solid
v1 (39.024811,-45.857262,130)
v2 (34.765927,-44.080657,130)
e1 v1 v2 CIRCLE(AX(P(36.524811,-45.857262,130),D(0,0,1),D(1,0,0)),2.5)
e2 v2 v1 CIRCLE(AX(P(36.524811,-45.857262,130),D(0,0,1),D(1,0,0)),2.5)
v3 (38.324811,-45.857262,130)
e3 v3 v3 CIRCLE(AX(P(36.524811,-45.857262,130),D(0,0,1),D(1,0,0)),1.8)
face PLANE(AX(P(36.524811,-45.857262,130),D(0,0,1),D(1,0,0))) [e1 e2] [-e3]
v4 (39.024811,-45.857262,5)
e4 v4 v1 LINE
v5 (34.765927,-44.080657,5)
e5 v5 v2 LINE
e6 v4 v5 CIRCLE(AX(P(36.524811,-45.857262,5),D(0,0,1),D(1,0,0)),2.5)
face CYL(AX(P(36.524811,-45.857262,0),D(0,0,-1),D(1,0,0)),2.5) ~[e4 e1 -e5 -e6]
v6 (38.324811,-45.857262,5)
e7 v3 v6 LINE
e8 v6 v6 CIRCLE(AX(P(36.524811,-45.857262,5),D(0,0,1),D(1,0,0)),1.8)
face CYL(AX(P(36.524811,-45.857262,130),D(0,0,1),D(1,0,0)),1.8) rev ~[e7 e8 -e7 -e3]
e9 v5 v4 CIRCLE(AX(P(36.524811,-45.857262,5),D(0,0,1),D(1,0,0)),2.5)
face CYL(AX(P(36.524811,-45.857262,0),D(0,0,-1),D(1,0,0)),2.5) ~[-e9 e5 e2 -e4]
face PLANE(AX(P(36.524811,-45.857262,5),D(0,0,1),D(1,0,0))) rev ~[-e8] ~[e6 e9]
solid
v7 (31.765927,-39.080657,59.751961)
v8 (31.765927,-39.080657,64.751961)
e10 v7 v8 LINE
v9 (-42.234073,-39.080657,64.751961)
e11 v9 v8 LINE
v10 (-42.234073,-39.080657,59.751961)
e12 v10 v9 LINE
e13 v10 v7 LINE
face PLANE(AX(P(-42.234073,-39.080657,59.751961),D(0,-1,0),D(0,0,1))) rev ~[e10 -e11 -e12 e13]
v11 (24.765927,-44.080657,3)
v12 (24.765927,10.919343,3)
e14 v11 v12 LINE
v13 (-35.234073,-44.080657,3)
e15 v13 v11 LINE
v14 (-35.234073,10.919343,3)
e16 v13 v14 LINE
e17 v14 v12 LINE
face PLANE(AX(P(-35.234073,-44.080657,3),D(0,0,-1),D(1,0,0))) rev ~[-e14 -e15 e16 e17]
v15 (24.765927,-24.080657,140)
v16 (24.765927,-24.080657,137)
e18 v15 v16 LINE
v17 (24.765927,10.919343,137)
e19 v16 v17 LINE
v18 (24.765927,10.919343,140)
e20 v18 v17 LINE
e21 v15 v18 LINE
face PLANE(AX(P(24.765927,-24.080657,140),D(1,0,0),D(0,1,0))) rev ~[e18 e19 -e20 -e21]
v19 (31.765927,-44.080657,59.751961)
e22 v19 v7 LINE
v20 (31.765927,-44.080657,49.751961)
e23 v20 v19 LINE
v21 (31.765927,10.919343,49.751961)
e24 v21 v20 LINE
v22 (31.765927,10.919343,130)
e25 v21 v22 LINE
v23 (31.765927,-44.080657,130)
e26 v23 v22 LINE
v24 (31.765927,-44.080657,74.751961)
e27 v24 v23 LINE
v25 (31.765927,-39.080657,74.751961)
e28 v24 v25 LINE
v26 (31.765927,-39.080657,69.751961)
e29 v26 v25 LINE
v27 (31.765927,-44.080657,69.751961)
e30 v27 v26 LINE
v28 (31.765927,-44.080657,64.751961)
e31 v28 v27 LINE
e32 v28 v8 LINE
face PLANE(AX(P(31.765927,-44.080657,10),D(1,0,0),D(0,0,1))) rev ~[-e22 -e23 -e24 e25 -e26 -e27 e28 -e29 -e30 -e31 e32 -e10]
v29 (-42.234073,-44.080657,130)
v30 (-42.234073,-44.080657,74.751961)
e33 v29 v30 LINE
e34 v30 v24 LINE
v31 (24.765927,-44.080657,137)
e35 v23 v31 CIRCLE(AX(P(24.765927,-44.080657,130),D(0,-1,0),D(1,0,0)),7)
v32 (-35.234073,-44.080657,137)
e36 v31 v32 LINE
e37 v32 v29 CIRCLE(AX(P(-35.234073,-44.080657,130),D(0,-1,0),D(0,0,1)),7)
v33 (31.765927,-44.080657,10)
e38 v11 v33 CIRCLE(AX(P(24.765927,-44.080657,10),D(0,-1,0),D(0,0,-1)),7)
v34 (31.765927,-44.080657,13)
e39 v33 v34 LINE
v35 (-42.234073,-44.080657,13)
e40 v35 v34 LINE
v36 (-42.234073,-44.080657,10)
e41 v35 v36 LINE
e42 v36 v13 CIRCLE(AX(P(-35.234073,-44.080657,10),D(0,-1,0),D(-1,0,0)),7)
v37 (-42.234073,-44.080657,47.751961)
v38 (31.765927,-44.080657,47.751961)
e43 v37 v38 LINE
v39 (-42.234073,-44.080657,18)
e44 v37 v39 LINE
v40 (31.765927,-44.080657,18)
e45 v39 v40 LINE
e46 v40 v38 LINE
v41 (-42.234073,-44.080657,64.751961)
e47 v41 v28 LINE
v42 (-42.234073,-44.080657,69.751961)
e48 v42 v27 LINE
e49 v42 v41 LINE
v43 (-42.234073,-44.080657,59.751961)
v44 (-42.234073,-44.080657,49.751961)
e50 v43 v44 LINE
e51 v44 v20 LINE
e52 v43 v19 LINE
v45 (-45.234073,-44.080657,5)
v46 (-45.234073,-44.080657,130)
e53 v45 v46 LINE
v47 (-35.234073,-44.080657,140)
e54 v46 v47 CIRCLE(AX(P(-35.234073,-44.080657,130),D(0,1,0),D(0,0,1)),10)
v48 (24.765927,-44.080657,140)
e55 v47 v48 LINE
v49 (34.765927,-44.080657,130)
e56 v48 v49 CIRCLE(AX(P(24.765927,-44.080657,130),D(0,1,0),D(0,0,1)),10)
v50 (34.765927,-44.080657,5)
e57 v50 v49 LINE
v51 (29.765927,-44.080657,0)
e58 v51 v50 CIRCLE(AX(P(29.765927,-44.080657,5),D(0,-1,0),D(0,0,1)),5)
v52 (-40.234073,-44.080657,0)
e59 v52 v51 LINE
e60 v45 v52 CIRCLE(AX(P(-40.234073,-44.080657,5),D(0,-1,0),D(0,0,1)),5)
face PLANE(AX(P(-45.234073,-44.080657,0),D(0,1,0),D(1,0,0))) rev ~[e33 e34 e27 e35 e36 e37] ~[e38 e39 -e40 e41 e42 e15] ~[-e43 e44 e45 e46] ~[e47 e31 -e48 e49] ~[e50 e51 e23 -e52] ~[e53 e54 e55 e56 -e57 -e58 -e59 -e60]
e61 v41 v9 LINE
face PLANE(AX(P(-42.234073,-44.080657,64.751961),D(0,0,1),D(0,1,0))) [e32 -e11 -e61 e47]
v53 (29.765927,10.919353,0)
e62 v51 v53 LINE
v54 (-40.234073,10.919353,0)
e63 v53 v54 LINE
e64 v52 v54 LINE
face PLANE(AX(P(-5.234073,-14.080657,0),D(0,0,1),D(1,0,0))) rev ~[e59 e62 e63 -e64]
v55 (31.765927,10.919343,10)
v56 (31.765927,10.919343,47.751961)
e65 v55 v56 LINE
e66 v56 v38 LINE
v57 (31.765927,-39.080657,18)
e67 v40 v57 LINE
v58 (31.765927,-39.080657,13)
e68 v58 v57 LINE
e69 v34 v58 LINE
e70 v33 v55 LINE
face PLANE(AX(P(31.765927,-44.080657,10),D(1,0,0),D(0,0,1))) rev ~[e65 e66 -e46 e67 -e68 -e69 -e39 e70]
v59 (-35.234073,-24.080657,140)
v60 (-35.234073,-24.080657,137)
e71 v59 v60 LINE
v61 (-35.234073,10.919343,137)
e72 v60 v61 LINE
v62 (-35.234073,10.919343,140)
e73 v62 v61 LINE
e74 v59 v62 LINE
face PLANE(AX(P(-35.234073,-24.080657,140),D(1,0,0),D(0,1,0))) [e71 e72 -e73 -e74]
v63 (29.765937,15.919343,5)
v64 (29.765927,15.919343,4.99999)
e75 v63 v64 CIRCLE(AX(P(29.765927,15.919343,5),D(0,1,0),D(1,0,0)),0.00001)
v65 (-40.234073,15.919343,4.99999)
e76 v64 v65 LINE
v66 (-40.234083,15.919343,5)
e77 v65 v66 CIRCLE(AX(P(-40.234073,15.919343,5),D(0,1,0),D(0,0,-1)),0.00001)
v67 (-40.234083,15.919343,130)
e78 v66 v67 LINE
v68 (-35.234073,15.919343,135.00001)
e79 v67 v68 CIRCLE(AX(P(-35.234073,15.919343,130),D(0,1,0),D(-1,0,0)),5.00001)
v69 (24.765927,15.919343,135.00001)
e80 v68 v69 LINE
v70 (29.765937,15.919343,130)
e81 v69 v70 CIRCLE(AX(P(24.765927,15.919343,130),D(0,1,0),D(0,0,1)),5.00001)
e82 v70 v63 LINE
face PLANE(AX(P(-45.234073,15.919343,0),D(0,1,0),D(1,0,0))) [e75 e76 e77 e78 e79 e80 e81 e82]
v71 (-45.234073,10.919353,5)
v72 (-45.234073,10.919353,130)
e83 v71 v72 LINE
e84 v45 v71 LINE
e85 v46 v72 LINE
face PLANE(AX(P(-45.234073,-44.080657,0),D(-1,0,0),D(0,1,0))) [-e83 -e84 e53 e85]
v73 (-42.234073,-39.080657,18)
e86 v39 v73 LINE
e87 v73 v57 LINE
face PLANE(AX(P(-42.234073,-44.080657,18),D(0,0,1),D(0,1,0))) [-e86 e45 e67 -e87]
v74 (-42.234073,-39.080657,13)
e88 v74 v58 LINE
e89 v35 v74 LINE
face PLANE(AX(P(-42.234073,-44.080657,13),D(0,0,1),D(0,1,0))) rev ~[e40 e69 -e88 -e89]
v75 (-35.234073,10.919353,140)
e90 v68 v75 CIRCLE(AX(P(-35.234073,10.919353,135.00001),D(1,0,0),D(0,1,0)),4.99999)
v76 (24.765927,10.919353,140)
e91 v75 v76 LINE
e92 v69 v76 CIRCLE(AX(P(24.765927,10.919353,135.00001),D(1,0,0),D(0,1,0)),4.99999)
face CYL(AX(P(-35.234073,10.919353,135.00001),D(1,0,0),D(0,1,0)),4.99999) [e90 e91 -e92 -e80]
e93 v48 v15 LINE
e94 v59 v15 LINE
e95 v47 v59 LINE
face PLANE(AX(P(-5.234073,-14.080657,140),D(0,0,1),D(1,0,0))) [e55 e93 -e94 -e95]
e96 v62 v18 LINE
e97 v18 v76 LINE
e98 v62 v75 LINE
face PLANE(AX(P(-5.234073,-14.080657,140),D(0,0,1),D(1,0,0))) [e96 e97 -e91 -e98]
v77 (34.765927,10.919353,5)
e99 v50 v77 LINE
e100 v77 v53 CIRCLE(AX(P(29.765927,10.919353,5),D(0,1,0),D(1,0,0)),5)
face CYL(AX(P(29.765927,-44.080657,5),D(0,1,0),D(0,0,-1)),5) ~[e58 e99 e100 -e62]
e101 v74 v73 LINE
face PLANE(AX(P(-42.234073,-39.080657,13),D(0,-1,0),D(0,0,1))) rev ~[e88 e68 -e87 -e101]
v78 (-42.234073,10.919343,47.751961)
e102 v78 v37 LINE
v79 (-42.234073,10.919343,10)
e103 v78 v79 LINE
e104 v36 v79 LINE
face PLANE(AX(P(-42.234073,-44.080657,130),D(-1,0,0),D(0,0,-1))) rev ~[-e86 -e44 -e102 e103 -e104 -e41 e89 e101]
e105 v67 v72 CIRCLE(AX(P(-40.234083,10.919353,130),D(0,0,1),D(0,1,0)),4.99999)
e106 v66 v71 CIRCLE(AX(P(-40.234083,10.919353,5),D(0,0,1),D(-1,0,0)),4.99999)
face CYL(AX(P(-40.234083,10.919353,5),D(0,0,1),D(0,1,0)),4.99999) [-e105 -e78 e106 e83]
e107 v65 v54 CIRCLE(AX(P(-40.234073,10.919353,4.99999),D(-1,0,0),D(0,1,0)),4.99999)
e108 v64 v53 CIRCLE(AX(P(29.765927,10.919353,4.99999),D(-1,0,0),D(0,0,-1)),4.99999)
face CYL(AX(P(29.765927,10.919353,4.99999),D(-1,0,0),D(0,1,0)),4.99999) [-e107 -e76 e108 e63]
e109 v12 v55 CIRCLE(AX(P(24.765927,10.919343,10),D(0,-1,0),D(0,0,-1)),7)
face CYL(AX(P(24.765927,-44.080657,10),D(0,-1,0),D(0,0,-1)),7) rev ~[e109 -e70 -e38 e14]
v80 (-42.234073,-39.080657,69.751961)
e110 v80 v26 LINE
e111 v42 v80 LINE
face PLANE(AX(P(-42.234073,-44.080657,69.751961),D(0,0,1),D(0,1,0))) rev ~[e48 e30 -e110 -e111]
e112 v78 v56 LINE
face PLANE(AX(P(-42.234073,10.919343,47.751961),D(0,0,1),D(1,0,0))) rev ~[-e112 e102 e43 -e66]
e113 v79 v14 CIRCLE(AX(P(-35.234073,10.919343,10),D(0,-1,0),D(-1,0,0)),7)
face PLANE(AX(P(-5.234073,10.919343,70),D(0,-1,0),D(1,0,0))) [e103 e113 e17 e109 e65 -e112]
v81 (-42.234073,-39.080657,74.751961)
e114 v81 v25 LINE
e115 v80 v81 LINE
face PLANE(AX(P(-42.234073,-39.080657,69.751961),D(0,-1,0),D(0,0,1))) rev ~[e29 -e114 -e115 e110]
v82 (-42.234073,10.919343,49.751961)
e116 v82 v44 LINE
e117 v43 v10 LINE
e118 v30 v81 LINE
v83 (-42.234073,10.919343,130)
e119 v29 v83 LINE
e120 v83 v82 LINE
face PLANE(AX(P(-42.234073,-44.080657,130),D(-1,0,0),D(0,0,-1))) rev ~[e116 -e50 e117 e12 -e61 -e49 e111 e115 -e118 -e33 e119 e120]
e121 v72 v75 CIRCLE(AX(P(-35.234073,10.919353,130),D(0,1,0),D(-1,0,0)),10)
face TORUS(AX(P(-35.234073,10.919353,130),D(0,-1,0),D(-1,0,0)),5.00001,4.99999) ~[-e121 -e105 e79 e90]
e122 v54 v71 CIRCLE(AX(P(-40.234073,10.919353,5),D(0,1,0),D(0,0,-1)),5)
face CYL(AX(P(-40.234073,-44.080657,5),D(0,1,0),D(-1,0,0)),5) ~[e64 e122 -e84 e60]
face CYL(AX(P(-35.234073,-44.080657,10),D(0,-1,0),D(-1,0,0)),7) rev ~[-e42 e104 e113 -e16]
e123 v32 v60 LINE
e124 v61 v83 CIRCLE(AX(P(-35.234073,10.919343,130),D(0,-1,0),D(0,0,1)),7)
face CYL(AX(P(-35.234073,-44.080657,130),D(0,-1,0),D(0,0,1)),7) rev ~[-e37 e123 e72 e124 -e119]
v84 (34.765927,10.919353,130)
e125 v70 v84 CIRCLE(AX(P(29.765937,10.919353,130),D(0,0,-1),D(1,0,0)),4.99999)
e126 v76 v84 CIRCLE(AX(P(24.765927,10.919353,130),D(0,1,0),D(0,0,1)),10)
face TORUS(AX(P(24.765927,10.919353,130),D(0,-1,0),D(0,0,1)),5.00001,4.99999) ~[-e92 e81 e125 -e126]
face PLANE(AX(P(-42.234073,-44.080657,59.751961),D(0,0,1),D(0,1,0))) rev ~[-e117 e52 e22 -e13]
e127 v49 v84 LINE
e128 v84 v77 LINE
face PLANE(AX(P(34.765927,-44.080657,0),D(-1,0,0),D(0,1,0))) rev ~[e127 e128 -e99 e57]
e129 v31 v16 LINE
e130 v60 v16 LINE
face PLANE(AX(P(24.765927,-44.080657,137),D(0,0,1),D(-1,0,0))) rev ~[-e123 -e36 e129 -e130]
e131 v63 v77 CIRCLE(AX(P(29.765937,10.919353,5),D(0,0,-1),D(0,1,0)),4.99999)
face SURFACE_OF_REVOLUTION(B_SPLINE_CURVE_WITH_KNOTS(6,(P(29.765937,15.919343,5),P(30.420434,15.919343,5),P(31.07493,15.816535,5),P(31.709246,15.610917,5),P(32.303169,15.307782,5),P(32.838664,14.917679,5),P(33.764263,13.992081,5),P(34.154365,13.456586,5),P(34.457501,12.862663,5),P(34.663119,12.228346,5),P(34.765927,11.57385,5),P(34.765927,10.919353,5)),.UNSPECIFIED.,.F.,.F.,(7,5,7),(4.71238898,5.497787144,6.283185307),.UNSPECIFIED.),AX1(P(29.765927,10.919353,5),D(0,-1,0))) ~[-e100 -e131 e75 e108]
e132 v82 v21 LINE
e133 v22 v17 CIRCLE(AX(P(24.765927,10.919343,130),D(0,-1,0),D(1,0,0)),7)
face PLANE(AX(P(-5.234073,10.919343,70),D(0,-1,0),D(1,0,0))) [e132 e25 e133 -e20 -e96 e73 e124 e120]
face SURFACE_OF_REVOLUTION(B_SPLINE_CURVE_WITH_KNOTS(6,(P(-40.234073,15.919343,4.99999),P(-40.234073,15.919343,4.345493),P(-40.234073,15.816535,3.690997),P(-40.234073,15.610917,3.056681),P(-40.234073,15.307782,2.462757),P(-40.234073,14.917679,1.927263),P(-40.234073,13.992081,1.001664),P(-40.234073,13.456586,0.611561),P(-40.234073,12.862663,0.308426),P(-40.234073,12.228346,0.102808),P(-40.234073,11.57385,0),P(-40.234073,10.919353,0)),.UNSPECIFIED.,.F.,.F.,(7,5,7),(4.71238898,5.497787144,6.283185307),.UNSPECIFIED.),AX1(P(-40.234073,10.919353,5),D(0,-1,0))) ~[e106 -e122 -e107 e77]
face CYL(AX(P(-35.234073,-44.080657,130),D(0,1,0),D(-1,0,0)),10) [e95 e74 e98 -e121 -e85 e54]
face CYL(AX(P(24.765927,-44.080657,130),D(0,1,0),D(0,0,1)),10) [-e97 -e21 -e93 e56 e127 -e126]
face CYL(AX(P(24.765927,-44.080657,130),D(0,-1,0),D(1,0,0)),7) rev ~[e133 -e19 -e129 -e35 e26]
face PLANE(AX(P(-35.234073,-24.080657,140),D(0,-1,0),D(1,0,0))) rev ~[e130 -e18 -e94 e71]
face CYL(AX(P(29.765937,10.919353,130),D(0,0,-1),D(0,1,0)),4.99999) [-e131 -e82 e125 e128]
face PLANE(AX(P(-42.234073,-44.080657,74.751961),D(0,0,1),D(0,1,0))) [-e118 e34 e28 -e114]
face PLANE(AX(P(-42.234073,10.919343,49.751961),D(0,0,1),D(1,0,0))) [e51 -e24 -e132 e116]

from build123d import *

# Parameters (mm, degrees)
F0_W      = 80
F0_H      = 60
F1_DEPTH  = 140
F2_R      = 10
F3_R      = 10
F4_R      = 5
F5_R      = 5
F7_DEPTH  = 55
F9_W      = 74
F9_H      = 2
F10_DEPTH = 55
F11_W     = 60
F11_H     = 35
F12_DEPTH = 28
F13_R     = 4.99999
F14_W     = 5
F14_H     = 5
F15_DEPTH = 74
F16_W     = 5
F16_H     = 5
F17_DEPTH = 74
F18_R     = 2.5
F19_DEPTH = 130
F20_DEPTH = 5
F21_W     = 5
F21_H     = 5
F22_DEPTH = 74
F23_R     = 1.8
F24_DEPTH = 132


# Not quite as in the source:
# - a fillet or chamfer is up to 0.001 mm smaller than in the source, because OpenCascade refuses the exact size
# - a feature names something its author has since deleted; it is built from what else it names


with BuildPart() as f1:
    # F0 (on Top) → F1 (new body)
    with BuildSketch(Plane.XY):
        with Locations((-5.2340733026, -14.0806569159)):
            Rectangle(F0_W, F0_H)
    extrude(amount=F1_DEPTH)

    # F2
    f2_edges = [f1.edges().sort_by_distance(p)[0] for p in [
        (-45.234073, -14.080657, 140),
    ]]
    fillet(f2_edges, radius=F2_R)

    # F3
    f3_edges = [f1.edges().sort_by_distance(p)[0] for p in [
        (34.765927, -14.080657, 140),
    ]]
    fillet(f3_edges, radius=F3_R)

    # F4
    f4_edges = [f1.edges().sort_by_distance(p)[0] for p in [
        (-45.234073, -14.080657, 0),
    ]]
    fillet(f4_edges, radius=F4_R)

    # F5
    f5_edges = [f1.edges().sort_by_distance(p)[0] for p in [
        (34.765927, -14.080657, 0),
    ]]
    fillet(f5_edges, radius=F5_R)

    # F6 (on face) → F7 (cut)
    with BuildSketch(Plane.XZ.offset(44.0806569159)):
        with BuildLine():
            Line((24.7659266974, 137), (-35.2340733026, 137))
            ThreePointArc((-35.2340733026, 137), (-40.1838207709, 134.9497474683), (-42.2340733026, 130))
            Line((-42.2340733026, 130), (-42.2340733026, 10))
            ThreePointArc((-42.2340733026, 10), (-40.1838207709, 5.0502525317), (-35.2340733026, 3))
            Line((-35.2340733026, 3), (24.7659266974, 3))
            ThreePointArc((24.7659266974, 3), (29.7156741658, 5.0502525317), (31.7659266974, 10))
            Line((31.7659266974, 10), (31.7659266974, 130))
            ThreePointArc((31.7659266974, 130), (29.7156741658, 134.9497474683), (24.7659266974, 137))
        make_face()
    extrude(amount=-F7_DEPTH, mode=Mode.SUBTRACT)

    # F9 (on face) → F10 (join)
    with BuildSketch(Plane.XZ.offset(-10.9193430841)):
        with Locations((-5.2340733026, 48.7519614398)):
            Rectangle(F9_W, F9_H)
    extrude(amount=F10_DEPTH)

    # F11 (on face) → F12 (cut)
    with BuildSketch(Plane.XY.offset(140)):
        with Locations((-5.2340733026, -6.5806569159)):
            Rectangle(F11_W, F11_H)
    extrude(amount=-F12_DEPTH, mode=Mode.SUBTRACT)

    # F13 (radius 5 in the source; OpenCascade refuses exactly that, so slightly less here)
    f13_edges = [f1.edges().sort_by_distance(p)[0] for p in [
        (-5.234073, 15.919343, 140),
    ]]
    fillet(f13_edges, radius=F13_R)

    # F14 (on face) → F15 (join)
    with BuildSketch(Plane.YZ.offset(-42.2340733026)):
        with Locations((-41.5806569159, 62.2519614398)):
            Rectangle(F14_W, F14_H)
    extrude(amount=F15_DEPTH)

    # F16 (on face) → F17 (join)
    with BuildSketch(Plane.YZ.offset(-42.2340733026)):
        with Locations((-41.5806569159, 72.2519614398)):
            Rectangle(F16_W, F16_H)
    extrude(amount=F17_DEPTH)

    # F18 (on Top) → F19 (join)
    with BuildSketch(Plane.XY):
        with Locations((36.524810933, -45.8572621748)):
            Circle(F18_R)
    extrude(amount=F19_DEPTH)

    # F20 (cut): a face of the model
    f20_faces = [f1.faces().sort_by_distance(p)[0] for p in [
        (36.524810933, -45.8572621748, 0),
    ]]
    extrude(f20_faces, amount=-F20_DEPTH, mode=Mode.SUBTRACT)

    # F21 (on face) → F22 (join)
    with BuildSketch(Plane.YZ.offset(-42.2340733026)):
        with Locations((-41.5806569159, 15.5)):
            Rectangle(F21_W, F21_H)
    extrude(amount=F22_DEPTH)

    # F23 (on face) → F24 (cut)
    with BuildSketch(Plane.XY.offset(130)):
        with Locations((36.524810933, -45.8572621748)):
            Circle(F23_R)
    extrude(amount=-F24_DEPTH, mode=Mode.SUBTRACT)


solid = f1.part
